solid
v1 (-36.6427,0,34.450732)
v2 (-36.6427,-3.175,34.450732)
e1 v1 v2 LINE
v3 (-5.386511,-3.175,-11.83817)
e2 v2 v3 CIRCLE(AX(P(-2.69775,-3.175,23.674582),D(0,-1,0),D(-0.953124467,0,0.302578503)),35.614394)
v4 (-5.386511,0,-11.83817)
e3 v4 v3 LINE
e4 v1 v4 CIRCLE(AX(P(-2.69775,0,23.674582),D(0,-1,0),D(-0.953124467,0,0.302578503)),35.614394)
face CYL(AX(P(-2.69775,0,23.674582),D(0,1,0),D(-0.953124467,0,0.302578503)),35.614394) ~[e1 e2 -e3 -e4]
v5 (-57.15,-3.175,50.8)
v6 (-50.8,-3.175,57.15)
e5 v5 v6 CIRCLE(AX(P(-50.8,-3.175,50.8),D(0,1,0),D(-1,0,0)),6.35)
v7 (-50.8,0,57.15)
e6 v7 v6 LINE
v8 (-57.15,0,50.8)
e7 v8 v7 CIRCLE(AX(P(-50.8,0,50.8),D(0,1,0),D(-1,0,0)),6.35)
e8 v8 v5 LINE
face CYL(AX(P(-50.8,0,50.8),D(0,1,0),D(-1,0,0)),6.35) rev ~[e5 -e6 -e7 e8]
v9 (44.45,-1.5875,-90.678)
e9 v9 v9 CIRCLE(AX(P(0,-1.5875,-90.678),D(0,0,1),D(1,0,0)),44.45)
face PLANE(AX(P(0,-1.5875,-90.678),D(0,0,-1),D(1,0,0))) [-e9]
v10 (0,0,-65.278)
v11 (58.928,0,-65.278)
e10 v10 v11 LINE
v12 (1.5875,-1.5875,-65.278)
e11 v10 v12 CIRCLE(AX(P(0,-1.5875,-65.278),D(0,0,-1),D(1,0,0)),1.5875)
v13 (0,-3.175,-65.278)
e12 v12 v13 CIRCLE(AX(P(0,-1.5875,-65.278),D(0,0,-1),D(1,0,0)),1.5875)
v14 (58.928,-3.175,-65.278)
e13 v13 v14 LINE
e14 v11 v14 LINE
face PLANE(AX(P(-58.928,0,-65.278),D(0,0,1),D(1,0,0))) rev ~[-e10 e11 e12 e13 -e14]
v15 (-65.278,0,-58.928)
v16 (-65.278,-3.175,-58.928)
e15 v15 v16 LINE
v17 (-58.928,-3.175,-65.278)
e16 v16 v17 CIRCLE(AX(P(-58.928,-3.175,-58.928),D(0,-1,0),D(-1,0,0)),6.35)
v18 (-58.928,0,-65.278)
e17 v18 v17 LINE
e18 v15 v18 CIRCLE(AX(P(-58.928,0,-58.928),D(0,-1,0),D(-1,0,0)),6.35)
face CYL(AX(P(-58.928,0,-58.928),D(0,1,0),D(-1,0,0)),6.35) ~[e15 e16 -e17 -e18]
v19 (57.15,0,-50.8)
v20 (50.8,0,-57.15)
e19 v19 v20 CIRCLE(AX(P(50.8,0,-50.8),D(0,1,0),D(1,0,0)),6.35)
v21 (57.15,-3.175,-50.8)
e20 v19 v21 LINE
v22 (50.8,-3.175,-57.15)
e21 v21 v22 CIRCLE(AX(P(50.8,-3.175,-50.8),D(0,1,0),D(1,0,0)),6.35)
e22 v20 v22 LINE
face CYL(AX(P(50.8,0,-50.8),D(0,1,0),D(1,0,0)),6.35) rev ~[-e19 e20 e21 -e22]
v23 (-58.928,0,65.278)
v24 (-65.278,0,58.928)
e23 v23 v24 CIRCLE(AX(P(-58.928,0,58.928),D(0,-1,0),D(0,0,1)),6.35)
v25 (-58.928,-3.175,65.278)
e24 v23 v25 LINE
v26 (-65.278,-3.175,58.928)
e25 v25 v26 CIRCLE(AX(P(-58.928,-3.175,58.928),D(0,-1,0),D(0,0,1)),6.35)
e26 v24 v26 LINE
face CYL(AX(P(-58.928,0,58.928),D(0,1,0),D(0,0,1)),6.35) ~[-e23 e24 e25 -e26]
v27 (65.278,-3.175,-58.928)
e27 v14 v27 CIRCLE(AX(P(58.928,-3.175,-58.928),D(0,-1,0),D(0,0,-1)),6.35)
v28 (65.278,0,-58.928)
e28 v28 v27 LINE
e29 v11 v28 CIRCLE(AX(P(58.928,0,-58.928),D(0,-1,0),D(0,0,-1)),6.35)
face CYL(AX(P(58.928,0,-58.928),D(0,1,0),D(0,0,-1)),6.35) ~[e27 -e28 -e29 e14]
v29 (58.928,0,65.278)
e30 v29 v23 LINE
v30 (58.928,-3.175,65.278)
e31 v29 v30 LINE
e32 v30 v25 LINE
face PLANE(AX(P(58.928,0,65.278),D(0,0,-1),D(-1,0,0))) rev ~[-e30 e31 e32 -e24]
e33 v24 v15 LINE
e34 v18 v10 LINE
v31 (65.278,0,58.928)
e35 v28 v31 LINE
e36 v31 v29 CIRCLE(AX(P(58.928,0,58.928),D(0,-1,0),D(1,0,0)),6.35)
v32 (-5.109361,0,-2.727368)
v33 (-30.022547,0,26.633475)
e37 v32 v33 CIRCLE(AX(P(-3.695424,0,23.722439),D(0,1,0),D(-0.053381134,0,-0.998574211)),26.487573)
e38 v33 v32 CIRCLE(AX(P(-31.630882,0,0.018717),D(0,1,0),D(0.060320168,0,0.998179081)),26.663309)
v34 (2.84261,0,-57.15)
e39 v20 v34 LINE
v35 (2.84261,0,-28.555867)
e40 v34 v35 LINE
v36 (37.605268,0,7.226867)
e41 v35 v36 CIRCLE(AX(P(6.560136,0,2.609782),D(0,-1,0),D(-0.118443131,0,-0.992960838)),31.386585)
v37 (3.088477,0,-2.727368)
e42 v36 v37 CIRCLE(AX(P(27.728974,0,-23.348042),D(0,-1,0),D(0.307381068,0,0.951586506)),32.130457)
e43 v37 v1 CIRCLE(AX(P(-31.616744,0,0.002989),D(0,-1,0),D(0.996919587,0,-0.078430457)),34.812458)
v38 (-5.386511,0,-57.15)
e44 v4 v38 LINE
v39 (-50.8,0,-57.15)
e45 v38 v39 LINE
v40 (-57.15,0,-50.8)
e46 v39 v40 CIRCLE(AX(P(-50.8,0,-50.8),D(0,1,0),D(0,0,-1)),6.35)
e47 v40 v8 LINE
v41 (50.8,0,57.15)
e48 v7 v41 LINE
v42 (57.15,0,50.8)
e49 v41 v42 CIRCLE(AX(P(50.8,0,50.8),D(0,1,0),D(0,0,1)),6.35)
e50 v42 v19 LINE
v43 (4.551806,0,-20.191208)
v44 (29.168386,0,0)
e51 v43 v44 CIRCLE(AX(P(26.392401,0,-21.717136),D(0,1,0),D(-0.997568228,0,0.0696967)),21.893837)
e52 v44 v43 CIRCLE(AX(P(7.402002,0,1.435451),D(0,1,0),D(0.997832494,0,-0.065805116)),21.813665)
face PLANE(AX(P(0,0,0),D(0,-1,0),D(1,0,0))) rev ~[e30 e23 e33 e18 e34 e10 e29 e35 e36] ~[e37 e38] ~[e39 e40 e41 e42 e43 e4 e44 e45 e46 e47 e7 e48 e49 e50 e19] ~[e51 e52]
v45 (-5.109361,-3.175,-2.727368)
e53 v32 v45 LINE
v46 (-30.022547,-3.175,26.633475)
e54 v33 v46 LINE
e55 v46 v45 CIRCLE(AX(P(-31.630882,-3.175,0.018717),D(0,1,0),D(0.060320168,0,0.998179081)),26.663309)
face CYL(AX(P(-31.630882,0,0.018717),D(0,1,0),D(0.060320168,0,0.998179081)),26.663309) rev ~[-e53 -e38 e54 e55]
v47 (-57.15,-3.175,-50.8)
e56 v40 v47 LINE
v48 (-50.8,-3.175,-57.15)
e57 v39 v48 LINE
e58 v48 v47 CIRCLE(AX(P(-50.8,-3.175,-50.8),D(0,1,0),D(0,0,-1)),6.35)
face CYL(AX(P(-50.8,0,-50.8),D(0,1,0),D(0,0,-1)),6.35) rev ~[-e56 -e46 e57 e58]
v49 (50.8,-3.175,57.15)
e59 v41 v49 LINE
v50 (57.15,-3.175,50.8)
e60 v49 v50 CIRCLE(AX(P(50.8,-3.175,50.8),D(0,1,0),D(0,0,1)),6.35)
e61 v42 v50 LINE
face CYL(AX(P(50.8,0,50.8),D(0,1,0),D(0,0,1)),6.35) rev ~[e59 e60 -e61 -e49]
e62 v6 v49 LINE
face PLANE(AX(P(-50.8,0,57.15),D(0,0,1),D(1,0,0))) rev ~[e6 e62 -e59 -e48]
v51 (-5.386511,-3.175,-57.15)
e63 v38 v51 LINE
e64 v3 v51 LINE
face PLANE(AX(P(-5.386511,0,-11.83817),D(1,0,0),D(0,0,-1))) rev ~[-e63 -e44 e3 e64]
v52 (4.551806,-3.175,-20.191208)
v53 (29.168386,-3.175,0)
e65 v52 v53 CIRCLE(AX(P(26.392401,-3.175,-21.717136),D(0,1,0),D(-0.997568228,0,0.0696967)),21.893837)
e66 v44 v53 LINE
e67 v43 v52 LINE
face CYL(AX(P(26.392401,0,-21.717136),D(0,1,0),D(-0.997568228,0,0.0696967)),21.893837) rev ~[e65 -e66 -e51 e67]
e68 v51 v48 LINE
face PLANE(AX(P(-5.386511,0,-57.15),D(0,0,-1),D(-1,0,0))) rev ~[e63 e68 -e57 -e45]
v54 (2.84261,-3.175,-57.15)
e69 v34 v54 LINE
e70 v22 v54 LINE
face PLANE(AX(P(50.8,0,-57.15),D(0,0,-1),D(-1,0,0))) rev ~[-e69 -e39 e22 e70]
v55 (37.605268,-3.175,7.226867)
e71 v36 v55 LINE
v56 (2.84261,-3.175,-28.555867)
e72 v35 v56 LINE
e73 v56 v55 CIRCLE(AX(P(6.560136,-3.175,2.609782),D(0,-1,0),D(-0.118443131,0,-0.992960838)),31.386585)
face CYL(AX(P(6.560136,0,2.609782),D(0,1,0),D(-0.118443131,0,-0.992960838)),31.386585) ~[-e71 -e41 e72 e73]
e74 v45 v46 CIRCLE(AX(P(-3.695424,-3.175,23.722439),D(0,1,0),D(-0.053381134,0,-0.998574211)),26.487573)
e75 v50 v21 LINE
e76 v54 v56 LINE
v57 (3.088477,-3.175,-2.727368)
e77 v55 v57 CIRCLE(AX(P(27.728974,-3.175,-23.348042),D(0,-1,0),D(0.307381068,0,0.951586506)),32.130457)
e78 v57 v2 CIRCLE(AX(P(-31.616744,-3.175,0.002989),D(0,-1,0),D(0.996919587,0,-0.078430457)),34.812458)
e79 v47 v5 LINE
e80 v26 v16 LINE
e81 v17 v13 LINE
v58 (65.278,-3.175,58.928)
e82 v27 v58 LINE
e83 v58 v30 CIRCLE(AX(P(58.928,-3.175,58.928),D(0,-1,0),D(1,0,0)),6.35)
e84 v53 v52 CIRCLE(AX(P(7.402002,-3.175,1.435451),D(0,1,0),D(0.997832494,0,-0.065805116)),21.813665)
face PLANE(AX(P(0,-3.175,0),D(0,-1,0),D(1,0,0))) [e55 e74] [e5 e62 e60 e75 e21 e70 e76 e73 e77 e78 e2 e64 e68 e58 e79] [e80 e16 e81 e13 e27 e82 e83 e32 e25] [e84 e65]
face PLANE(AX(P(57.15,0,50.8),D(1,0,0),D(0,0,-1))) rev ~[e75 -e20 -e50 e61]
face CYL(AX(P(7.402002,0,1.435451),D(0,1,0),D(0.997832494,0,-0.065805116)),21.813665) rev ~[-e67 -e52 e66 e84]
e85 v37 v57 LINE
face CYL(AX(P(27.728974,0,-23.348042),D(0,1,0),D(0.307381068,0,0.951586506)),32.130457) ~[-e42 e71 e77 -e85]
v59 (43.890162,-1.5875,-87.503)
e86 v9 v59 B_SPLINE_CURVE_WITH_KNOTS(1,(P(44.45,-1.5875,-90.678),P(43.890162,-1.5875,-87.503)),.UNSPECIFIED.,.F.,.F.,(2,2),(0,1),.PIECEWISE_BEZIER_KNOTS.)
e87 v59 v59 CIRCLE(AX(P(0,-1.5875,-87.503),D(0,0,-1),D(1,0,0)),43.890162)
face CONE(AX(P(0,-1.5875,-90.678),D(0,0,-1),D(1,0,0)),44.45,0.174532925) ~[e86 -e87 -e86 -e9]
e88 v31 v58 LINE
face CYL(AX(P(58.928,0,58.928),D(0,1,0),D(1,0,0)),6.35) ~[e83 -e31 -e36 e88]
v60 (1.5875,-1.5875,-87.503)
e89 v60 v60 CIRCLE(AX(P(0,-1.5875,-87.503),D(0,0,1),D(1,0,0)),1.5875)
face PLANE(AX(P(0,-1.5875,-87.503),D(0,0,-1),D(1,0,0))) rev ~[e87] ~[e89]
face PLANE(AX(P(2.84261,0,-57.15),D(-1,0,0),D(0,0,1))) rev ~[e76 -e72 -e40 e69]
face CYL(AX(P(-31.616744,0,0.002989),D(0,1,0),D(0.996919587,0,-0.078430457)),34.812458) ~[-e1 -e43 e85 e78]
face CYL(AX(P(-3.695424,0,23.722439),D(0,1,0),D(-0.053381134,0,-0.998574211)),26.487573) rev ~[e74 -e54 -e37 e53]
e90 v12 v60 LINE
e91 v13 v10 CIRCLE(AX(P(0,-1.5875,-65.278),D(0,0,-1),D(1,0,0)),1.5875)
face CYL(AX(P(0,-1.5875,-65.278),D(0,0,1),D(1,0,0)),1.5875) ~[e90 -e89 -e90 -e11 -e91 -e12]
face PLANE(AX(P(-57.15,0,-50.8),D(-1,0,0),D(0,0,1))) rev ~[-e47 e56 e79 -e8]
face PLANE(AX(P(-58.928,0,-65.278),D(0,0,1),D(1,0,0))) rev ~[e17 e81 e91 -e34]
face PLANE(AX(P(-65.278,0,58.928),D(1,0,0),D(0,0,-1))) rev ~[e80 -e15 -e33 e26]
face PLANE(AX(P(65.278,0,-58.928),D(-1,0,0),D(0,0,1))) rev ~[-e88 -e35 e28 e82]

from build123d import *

# Parameters (mm, degrees)
F2_DEPTH = 3.175
F3_R     = 1.5875
F4_DEPTH = 25.4
F5_R     = 44.45
F6_DEPTH = 3.175
F6_TAPER = 10


# Not quite as in the source:
# - a feature of the source that left no trace in its solid (it failed there, or was rolled back) is left out


with BuildPart() as f2:
    # F1 (on Front) → F2 (new body)
    with BuildSketch(Plane.XZ):
        with BuildLine():
            Line((58.928, 65.278), (-58.928, 65.278))
            ThreePointArc((-58.928, 65.278), (-63.4181280605, 63.4181280605), (-65.278, 58.928))
            Line((-65.278, 58.928), (-65.278, -58.928))
            ThreePointArc((-65.278, -58.928), (-63.4181280605, -63.4181280605), (-58.928, -65.278))
            Line((-58.928, -65.278), (58.928, -65.278))
            ThreePointArc((58.928, -65.278), (63.4181280605, -63.4181280605), (65.278, -58.928))
            Line((65.278, -58.928), (65.278, 58.928))
            ThreePointArc((65.278, 58.928), (63.4181280605, 63.4181280605), (58.928, 65.278))
        make_face()
        with BuildLine():
            ThreePointArc((29.1683860123, 0), (21.2359008795, -15.4304684341), (4.5518055526, -20.1912078303))
            ThreePointArc((4.5518055526, -20.1912078303), (12.5076591177, -4.7892295638), (29.1683860123, 0))
        make_face(mode=Mode.SUBTRACT)
        with BuildLine():
            ThreePointArc((-30.0225467432, 26.633475086), (-11.3001914874, 17.269662026), (-5.1093608776, -2.7273676961))
            ThreePointArc((-5.1093608776, -2.7273676961), (-23.8921161087, 6.5851949341), (-30.0225467432, 26.633475086))
        make_face(mode=Mode.SUBTRACT)
        with BuildLine():
            Line((-5.3865113296, -11.8381703437), (-5.3865113296, -57.15))
            Line((-5.3865113296, -57.15), (-50.8, -57.15))
            ThreePointArc((-50.8, -57.15), (-55.2901280605, -55.2901280605), (-57.15, -50.8))
            Line((-57.15, -50.8), (-57.15, 50.8))
            ThreePointArc((-57.15, 50.8), (-55.2901280605, 55.2901280605), (-50.8, 57.15))
            Line((-50.8, 57.15), (50.8, 57.15))
            ThreePointArc((50.8, 57.15), (55.2901280605, 55.2901280605), (57.15, 50.8))
            Line((57.15, 50.8), (57.15, -50.8))
            ThreePointArc((57.15, -50.8), (55.2901280605, -55.2901280605), (50.8, -57.15))
            Line((50.8, -57.15), (2.8426104691, -57.15))
            Line((2.8426104691, -57.15), (2.8426104691, -28.5558674872))
            ThreePointArc((2.8426104691, -28.5558674872), (29.0723668952, -19.260680993), (37.6052677218, 7.2268673576))
            ThreePointArc((37.6052677218, 7.2268673576), (18.8257654598, 7.524261984), (3.0884773301, -2.7273676961))
            ThreePointArc((3.0884773301, -2.7273676961), (-7.830876963, 25.422268659), (-36.6427004337, 34.4507321715))
            ThreePointArc((-36.6427004337, 34.4507321715), (-32.213387286, 3.7443986853), (-5.3865113296, -11.8381703437))
        make_face(mode=Mode.SUBTRACT)
    extrude(amount=F2_DEPTH)

    # F3 (on face) → F4 (join)
    with BuildSketch(Plane(origin=(0, 0, -65.278), x_dir=(1, 0, 0), z_dir=(0, 0, -1))):
        with Locations((0, 1.5875)):
            Circle(F3_R)
    extrude(amount=F4_DEPTH)

    # F5 (on face) → F6 (join)
    with BuildSketch(Plane(origin=(0, 0, -90.678), x_dir=(1, 0, 0), z_dir=(0, 0, -1))):
        with Locations((0, 1.5875)):
            Circle(F5_R)
    extrude(amount=-F6_DEPTH, taper=F6_TAPER)


solid = f2.part
